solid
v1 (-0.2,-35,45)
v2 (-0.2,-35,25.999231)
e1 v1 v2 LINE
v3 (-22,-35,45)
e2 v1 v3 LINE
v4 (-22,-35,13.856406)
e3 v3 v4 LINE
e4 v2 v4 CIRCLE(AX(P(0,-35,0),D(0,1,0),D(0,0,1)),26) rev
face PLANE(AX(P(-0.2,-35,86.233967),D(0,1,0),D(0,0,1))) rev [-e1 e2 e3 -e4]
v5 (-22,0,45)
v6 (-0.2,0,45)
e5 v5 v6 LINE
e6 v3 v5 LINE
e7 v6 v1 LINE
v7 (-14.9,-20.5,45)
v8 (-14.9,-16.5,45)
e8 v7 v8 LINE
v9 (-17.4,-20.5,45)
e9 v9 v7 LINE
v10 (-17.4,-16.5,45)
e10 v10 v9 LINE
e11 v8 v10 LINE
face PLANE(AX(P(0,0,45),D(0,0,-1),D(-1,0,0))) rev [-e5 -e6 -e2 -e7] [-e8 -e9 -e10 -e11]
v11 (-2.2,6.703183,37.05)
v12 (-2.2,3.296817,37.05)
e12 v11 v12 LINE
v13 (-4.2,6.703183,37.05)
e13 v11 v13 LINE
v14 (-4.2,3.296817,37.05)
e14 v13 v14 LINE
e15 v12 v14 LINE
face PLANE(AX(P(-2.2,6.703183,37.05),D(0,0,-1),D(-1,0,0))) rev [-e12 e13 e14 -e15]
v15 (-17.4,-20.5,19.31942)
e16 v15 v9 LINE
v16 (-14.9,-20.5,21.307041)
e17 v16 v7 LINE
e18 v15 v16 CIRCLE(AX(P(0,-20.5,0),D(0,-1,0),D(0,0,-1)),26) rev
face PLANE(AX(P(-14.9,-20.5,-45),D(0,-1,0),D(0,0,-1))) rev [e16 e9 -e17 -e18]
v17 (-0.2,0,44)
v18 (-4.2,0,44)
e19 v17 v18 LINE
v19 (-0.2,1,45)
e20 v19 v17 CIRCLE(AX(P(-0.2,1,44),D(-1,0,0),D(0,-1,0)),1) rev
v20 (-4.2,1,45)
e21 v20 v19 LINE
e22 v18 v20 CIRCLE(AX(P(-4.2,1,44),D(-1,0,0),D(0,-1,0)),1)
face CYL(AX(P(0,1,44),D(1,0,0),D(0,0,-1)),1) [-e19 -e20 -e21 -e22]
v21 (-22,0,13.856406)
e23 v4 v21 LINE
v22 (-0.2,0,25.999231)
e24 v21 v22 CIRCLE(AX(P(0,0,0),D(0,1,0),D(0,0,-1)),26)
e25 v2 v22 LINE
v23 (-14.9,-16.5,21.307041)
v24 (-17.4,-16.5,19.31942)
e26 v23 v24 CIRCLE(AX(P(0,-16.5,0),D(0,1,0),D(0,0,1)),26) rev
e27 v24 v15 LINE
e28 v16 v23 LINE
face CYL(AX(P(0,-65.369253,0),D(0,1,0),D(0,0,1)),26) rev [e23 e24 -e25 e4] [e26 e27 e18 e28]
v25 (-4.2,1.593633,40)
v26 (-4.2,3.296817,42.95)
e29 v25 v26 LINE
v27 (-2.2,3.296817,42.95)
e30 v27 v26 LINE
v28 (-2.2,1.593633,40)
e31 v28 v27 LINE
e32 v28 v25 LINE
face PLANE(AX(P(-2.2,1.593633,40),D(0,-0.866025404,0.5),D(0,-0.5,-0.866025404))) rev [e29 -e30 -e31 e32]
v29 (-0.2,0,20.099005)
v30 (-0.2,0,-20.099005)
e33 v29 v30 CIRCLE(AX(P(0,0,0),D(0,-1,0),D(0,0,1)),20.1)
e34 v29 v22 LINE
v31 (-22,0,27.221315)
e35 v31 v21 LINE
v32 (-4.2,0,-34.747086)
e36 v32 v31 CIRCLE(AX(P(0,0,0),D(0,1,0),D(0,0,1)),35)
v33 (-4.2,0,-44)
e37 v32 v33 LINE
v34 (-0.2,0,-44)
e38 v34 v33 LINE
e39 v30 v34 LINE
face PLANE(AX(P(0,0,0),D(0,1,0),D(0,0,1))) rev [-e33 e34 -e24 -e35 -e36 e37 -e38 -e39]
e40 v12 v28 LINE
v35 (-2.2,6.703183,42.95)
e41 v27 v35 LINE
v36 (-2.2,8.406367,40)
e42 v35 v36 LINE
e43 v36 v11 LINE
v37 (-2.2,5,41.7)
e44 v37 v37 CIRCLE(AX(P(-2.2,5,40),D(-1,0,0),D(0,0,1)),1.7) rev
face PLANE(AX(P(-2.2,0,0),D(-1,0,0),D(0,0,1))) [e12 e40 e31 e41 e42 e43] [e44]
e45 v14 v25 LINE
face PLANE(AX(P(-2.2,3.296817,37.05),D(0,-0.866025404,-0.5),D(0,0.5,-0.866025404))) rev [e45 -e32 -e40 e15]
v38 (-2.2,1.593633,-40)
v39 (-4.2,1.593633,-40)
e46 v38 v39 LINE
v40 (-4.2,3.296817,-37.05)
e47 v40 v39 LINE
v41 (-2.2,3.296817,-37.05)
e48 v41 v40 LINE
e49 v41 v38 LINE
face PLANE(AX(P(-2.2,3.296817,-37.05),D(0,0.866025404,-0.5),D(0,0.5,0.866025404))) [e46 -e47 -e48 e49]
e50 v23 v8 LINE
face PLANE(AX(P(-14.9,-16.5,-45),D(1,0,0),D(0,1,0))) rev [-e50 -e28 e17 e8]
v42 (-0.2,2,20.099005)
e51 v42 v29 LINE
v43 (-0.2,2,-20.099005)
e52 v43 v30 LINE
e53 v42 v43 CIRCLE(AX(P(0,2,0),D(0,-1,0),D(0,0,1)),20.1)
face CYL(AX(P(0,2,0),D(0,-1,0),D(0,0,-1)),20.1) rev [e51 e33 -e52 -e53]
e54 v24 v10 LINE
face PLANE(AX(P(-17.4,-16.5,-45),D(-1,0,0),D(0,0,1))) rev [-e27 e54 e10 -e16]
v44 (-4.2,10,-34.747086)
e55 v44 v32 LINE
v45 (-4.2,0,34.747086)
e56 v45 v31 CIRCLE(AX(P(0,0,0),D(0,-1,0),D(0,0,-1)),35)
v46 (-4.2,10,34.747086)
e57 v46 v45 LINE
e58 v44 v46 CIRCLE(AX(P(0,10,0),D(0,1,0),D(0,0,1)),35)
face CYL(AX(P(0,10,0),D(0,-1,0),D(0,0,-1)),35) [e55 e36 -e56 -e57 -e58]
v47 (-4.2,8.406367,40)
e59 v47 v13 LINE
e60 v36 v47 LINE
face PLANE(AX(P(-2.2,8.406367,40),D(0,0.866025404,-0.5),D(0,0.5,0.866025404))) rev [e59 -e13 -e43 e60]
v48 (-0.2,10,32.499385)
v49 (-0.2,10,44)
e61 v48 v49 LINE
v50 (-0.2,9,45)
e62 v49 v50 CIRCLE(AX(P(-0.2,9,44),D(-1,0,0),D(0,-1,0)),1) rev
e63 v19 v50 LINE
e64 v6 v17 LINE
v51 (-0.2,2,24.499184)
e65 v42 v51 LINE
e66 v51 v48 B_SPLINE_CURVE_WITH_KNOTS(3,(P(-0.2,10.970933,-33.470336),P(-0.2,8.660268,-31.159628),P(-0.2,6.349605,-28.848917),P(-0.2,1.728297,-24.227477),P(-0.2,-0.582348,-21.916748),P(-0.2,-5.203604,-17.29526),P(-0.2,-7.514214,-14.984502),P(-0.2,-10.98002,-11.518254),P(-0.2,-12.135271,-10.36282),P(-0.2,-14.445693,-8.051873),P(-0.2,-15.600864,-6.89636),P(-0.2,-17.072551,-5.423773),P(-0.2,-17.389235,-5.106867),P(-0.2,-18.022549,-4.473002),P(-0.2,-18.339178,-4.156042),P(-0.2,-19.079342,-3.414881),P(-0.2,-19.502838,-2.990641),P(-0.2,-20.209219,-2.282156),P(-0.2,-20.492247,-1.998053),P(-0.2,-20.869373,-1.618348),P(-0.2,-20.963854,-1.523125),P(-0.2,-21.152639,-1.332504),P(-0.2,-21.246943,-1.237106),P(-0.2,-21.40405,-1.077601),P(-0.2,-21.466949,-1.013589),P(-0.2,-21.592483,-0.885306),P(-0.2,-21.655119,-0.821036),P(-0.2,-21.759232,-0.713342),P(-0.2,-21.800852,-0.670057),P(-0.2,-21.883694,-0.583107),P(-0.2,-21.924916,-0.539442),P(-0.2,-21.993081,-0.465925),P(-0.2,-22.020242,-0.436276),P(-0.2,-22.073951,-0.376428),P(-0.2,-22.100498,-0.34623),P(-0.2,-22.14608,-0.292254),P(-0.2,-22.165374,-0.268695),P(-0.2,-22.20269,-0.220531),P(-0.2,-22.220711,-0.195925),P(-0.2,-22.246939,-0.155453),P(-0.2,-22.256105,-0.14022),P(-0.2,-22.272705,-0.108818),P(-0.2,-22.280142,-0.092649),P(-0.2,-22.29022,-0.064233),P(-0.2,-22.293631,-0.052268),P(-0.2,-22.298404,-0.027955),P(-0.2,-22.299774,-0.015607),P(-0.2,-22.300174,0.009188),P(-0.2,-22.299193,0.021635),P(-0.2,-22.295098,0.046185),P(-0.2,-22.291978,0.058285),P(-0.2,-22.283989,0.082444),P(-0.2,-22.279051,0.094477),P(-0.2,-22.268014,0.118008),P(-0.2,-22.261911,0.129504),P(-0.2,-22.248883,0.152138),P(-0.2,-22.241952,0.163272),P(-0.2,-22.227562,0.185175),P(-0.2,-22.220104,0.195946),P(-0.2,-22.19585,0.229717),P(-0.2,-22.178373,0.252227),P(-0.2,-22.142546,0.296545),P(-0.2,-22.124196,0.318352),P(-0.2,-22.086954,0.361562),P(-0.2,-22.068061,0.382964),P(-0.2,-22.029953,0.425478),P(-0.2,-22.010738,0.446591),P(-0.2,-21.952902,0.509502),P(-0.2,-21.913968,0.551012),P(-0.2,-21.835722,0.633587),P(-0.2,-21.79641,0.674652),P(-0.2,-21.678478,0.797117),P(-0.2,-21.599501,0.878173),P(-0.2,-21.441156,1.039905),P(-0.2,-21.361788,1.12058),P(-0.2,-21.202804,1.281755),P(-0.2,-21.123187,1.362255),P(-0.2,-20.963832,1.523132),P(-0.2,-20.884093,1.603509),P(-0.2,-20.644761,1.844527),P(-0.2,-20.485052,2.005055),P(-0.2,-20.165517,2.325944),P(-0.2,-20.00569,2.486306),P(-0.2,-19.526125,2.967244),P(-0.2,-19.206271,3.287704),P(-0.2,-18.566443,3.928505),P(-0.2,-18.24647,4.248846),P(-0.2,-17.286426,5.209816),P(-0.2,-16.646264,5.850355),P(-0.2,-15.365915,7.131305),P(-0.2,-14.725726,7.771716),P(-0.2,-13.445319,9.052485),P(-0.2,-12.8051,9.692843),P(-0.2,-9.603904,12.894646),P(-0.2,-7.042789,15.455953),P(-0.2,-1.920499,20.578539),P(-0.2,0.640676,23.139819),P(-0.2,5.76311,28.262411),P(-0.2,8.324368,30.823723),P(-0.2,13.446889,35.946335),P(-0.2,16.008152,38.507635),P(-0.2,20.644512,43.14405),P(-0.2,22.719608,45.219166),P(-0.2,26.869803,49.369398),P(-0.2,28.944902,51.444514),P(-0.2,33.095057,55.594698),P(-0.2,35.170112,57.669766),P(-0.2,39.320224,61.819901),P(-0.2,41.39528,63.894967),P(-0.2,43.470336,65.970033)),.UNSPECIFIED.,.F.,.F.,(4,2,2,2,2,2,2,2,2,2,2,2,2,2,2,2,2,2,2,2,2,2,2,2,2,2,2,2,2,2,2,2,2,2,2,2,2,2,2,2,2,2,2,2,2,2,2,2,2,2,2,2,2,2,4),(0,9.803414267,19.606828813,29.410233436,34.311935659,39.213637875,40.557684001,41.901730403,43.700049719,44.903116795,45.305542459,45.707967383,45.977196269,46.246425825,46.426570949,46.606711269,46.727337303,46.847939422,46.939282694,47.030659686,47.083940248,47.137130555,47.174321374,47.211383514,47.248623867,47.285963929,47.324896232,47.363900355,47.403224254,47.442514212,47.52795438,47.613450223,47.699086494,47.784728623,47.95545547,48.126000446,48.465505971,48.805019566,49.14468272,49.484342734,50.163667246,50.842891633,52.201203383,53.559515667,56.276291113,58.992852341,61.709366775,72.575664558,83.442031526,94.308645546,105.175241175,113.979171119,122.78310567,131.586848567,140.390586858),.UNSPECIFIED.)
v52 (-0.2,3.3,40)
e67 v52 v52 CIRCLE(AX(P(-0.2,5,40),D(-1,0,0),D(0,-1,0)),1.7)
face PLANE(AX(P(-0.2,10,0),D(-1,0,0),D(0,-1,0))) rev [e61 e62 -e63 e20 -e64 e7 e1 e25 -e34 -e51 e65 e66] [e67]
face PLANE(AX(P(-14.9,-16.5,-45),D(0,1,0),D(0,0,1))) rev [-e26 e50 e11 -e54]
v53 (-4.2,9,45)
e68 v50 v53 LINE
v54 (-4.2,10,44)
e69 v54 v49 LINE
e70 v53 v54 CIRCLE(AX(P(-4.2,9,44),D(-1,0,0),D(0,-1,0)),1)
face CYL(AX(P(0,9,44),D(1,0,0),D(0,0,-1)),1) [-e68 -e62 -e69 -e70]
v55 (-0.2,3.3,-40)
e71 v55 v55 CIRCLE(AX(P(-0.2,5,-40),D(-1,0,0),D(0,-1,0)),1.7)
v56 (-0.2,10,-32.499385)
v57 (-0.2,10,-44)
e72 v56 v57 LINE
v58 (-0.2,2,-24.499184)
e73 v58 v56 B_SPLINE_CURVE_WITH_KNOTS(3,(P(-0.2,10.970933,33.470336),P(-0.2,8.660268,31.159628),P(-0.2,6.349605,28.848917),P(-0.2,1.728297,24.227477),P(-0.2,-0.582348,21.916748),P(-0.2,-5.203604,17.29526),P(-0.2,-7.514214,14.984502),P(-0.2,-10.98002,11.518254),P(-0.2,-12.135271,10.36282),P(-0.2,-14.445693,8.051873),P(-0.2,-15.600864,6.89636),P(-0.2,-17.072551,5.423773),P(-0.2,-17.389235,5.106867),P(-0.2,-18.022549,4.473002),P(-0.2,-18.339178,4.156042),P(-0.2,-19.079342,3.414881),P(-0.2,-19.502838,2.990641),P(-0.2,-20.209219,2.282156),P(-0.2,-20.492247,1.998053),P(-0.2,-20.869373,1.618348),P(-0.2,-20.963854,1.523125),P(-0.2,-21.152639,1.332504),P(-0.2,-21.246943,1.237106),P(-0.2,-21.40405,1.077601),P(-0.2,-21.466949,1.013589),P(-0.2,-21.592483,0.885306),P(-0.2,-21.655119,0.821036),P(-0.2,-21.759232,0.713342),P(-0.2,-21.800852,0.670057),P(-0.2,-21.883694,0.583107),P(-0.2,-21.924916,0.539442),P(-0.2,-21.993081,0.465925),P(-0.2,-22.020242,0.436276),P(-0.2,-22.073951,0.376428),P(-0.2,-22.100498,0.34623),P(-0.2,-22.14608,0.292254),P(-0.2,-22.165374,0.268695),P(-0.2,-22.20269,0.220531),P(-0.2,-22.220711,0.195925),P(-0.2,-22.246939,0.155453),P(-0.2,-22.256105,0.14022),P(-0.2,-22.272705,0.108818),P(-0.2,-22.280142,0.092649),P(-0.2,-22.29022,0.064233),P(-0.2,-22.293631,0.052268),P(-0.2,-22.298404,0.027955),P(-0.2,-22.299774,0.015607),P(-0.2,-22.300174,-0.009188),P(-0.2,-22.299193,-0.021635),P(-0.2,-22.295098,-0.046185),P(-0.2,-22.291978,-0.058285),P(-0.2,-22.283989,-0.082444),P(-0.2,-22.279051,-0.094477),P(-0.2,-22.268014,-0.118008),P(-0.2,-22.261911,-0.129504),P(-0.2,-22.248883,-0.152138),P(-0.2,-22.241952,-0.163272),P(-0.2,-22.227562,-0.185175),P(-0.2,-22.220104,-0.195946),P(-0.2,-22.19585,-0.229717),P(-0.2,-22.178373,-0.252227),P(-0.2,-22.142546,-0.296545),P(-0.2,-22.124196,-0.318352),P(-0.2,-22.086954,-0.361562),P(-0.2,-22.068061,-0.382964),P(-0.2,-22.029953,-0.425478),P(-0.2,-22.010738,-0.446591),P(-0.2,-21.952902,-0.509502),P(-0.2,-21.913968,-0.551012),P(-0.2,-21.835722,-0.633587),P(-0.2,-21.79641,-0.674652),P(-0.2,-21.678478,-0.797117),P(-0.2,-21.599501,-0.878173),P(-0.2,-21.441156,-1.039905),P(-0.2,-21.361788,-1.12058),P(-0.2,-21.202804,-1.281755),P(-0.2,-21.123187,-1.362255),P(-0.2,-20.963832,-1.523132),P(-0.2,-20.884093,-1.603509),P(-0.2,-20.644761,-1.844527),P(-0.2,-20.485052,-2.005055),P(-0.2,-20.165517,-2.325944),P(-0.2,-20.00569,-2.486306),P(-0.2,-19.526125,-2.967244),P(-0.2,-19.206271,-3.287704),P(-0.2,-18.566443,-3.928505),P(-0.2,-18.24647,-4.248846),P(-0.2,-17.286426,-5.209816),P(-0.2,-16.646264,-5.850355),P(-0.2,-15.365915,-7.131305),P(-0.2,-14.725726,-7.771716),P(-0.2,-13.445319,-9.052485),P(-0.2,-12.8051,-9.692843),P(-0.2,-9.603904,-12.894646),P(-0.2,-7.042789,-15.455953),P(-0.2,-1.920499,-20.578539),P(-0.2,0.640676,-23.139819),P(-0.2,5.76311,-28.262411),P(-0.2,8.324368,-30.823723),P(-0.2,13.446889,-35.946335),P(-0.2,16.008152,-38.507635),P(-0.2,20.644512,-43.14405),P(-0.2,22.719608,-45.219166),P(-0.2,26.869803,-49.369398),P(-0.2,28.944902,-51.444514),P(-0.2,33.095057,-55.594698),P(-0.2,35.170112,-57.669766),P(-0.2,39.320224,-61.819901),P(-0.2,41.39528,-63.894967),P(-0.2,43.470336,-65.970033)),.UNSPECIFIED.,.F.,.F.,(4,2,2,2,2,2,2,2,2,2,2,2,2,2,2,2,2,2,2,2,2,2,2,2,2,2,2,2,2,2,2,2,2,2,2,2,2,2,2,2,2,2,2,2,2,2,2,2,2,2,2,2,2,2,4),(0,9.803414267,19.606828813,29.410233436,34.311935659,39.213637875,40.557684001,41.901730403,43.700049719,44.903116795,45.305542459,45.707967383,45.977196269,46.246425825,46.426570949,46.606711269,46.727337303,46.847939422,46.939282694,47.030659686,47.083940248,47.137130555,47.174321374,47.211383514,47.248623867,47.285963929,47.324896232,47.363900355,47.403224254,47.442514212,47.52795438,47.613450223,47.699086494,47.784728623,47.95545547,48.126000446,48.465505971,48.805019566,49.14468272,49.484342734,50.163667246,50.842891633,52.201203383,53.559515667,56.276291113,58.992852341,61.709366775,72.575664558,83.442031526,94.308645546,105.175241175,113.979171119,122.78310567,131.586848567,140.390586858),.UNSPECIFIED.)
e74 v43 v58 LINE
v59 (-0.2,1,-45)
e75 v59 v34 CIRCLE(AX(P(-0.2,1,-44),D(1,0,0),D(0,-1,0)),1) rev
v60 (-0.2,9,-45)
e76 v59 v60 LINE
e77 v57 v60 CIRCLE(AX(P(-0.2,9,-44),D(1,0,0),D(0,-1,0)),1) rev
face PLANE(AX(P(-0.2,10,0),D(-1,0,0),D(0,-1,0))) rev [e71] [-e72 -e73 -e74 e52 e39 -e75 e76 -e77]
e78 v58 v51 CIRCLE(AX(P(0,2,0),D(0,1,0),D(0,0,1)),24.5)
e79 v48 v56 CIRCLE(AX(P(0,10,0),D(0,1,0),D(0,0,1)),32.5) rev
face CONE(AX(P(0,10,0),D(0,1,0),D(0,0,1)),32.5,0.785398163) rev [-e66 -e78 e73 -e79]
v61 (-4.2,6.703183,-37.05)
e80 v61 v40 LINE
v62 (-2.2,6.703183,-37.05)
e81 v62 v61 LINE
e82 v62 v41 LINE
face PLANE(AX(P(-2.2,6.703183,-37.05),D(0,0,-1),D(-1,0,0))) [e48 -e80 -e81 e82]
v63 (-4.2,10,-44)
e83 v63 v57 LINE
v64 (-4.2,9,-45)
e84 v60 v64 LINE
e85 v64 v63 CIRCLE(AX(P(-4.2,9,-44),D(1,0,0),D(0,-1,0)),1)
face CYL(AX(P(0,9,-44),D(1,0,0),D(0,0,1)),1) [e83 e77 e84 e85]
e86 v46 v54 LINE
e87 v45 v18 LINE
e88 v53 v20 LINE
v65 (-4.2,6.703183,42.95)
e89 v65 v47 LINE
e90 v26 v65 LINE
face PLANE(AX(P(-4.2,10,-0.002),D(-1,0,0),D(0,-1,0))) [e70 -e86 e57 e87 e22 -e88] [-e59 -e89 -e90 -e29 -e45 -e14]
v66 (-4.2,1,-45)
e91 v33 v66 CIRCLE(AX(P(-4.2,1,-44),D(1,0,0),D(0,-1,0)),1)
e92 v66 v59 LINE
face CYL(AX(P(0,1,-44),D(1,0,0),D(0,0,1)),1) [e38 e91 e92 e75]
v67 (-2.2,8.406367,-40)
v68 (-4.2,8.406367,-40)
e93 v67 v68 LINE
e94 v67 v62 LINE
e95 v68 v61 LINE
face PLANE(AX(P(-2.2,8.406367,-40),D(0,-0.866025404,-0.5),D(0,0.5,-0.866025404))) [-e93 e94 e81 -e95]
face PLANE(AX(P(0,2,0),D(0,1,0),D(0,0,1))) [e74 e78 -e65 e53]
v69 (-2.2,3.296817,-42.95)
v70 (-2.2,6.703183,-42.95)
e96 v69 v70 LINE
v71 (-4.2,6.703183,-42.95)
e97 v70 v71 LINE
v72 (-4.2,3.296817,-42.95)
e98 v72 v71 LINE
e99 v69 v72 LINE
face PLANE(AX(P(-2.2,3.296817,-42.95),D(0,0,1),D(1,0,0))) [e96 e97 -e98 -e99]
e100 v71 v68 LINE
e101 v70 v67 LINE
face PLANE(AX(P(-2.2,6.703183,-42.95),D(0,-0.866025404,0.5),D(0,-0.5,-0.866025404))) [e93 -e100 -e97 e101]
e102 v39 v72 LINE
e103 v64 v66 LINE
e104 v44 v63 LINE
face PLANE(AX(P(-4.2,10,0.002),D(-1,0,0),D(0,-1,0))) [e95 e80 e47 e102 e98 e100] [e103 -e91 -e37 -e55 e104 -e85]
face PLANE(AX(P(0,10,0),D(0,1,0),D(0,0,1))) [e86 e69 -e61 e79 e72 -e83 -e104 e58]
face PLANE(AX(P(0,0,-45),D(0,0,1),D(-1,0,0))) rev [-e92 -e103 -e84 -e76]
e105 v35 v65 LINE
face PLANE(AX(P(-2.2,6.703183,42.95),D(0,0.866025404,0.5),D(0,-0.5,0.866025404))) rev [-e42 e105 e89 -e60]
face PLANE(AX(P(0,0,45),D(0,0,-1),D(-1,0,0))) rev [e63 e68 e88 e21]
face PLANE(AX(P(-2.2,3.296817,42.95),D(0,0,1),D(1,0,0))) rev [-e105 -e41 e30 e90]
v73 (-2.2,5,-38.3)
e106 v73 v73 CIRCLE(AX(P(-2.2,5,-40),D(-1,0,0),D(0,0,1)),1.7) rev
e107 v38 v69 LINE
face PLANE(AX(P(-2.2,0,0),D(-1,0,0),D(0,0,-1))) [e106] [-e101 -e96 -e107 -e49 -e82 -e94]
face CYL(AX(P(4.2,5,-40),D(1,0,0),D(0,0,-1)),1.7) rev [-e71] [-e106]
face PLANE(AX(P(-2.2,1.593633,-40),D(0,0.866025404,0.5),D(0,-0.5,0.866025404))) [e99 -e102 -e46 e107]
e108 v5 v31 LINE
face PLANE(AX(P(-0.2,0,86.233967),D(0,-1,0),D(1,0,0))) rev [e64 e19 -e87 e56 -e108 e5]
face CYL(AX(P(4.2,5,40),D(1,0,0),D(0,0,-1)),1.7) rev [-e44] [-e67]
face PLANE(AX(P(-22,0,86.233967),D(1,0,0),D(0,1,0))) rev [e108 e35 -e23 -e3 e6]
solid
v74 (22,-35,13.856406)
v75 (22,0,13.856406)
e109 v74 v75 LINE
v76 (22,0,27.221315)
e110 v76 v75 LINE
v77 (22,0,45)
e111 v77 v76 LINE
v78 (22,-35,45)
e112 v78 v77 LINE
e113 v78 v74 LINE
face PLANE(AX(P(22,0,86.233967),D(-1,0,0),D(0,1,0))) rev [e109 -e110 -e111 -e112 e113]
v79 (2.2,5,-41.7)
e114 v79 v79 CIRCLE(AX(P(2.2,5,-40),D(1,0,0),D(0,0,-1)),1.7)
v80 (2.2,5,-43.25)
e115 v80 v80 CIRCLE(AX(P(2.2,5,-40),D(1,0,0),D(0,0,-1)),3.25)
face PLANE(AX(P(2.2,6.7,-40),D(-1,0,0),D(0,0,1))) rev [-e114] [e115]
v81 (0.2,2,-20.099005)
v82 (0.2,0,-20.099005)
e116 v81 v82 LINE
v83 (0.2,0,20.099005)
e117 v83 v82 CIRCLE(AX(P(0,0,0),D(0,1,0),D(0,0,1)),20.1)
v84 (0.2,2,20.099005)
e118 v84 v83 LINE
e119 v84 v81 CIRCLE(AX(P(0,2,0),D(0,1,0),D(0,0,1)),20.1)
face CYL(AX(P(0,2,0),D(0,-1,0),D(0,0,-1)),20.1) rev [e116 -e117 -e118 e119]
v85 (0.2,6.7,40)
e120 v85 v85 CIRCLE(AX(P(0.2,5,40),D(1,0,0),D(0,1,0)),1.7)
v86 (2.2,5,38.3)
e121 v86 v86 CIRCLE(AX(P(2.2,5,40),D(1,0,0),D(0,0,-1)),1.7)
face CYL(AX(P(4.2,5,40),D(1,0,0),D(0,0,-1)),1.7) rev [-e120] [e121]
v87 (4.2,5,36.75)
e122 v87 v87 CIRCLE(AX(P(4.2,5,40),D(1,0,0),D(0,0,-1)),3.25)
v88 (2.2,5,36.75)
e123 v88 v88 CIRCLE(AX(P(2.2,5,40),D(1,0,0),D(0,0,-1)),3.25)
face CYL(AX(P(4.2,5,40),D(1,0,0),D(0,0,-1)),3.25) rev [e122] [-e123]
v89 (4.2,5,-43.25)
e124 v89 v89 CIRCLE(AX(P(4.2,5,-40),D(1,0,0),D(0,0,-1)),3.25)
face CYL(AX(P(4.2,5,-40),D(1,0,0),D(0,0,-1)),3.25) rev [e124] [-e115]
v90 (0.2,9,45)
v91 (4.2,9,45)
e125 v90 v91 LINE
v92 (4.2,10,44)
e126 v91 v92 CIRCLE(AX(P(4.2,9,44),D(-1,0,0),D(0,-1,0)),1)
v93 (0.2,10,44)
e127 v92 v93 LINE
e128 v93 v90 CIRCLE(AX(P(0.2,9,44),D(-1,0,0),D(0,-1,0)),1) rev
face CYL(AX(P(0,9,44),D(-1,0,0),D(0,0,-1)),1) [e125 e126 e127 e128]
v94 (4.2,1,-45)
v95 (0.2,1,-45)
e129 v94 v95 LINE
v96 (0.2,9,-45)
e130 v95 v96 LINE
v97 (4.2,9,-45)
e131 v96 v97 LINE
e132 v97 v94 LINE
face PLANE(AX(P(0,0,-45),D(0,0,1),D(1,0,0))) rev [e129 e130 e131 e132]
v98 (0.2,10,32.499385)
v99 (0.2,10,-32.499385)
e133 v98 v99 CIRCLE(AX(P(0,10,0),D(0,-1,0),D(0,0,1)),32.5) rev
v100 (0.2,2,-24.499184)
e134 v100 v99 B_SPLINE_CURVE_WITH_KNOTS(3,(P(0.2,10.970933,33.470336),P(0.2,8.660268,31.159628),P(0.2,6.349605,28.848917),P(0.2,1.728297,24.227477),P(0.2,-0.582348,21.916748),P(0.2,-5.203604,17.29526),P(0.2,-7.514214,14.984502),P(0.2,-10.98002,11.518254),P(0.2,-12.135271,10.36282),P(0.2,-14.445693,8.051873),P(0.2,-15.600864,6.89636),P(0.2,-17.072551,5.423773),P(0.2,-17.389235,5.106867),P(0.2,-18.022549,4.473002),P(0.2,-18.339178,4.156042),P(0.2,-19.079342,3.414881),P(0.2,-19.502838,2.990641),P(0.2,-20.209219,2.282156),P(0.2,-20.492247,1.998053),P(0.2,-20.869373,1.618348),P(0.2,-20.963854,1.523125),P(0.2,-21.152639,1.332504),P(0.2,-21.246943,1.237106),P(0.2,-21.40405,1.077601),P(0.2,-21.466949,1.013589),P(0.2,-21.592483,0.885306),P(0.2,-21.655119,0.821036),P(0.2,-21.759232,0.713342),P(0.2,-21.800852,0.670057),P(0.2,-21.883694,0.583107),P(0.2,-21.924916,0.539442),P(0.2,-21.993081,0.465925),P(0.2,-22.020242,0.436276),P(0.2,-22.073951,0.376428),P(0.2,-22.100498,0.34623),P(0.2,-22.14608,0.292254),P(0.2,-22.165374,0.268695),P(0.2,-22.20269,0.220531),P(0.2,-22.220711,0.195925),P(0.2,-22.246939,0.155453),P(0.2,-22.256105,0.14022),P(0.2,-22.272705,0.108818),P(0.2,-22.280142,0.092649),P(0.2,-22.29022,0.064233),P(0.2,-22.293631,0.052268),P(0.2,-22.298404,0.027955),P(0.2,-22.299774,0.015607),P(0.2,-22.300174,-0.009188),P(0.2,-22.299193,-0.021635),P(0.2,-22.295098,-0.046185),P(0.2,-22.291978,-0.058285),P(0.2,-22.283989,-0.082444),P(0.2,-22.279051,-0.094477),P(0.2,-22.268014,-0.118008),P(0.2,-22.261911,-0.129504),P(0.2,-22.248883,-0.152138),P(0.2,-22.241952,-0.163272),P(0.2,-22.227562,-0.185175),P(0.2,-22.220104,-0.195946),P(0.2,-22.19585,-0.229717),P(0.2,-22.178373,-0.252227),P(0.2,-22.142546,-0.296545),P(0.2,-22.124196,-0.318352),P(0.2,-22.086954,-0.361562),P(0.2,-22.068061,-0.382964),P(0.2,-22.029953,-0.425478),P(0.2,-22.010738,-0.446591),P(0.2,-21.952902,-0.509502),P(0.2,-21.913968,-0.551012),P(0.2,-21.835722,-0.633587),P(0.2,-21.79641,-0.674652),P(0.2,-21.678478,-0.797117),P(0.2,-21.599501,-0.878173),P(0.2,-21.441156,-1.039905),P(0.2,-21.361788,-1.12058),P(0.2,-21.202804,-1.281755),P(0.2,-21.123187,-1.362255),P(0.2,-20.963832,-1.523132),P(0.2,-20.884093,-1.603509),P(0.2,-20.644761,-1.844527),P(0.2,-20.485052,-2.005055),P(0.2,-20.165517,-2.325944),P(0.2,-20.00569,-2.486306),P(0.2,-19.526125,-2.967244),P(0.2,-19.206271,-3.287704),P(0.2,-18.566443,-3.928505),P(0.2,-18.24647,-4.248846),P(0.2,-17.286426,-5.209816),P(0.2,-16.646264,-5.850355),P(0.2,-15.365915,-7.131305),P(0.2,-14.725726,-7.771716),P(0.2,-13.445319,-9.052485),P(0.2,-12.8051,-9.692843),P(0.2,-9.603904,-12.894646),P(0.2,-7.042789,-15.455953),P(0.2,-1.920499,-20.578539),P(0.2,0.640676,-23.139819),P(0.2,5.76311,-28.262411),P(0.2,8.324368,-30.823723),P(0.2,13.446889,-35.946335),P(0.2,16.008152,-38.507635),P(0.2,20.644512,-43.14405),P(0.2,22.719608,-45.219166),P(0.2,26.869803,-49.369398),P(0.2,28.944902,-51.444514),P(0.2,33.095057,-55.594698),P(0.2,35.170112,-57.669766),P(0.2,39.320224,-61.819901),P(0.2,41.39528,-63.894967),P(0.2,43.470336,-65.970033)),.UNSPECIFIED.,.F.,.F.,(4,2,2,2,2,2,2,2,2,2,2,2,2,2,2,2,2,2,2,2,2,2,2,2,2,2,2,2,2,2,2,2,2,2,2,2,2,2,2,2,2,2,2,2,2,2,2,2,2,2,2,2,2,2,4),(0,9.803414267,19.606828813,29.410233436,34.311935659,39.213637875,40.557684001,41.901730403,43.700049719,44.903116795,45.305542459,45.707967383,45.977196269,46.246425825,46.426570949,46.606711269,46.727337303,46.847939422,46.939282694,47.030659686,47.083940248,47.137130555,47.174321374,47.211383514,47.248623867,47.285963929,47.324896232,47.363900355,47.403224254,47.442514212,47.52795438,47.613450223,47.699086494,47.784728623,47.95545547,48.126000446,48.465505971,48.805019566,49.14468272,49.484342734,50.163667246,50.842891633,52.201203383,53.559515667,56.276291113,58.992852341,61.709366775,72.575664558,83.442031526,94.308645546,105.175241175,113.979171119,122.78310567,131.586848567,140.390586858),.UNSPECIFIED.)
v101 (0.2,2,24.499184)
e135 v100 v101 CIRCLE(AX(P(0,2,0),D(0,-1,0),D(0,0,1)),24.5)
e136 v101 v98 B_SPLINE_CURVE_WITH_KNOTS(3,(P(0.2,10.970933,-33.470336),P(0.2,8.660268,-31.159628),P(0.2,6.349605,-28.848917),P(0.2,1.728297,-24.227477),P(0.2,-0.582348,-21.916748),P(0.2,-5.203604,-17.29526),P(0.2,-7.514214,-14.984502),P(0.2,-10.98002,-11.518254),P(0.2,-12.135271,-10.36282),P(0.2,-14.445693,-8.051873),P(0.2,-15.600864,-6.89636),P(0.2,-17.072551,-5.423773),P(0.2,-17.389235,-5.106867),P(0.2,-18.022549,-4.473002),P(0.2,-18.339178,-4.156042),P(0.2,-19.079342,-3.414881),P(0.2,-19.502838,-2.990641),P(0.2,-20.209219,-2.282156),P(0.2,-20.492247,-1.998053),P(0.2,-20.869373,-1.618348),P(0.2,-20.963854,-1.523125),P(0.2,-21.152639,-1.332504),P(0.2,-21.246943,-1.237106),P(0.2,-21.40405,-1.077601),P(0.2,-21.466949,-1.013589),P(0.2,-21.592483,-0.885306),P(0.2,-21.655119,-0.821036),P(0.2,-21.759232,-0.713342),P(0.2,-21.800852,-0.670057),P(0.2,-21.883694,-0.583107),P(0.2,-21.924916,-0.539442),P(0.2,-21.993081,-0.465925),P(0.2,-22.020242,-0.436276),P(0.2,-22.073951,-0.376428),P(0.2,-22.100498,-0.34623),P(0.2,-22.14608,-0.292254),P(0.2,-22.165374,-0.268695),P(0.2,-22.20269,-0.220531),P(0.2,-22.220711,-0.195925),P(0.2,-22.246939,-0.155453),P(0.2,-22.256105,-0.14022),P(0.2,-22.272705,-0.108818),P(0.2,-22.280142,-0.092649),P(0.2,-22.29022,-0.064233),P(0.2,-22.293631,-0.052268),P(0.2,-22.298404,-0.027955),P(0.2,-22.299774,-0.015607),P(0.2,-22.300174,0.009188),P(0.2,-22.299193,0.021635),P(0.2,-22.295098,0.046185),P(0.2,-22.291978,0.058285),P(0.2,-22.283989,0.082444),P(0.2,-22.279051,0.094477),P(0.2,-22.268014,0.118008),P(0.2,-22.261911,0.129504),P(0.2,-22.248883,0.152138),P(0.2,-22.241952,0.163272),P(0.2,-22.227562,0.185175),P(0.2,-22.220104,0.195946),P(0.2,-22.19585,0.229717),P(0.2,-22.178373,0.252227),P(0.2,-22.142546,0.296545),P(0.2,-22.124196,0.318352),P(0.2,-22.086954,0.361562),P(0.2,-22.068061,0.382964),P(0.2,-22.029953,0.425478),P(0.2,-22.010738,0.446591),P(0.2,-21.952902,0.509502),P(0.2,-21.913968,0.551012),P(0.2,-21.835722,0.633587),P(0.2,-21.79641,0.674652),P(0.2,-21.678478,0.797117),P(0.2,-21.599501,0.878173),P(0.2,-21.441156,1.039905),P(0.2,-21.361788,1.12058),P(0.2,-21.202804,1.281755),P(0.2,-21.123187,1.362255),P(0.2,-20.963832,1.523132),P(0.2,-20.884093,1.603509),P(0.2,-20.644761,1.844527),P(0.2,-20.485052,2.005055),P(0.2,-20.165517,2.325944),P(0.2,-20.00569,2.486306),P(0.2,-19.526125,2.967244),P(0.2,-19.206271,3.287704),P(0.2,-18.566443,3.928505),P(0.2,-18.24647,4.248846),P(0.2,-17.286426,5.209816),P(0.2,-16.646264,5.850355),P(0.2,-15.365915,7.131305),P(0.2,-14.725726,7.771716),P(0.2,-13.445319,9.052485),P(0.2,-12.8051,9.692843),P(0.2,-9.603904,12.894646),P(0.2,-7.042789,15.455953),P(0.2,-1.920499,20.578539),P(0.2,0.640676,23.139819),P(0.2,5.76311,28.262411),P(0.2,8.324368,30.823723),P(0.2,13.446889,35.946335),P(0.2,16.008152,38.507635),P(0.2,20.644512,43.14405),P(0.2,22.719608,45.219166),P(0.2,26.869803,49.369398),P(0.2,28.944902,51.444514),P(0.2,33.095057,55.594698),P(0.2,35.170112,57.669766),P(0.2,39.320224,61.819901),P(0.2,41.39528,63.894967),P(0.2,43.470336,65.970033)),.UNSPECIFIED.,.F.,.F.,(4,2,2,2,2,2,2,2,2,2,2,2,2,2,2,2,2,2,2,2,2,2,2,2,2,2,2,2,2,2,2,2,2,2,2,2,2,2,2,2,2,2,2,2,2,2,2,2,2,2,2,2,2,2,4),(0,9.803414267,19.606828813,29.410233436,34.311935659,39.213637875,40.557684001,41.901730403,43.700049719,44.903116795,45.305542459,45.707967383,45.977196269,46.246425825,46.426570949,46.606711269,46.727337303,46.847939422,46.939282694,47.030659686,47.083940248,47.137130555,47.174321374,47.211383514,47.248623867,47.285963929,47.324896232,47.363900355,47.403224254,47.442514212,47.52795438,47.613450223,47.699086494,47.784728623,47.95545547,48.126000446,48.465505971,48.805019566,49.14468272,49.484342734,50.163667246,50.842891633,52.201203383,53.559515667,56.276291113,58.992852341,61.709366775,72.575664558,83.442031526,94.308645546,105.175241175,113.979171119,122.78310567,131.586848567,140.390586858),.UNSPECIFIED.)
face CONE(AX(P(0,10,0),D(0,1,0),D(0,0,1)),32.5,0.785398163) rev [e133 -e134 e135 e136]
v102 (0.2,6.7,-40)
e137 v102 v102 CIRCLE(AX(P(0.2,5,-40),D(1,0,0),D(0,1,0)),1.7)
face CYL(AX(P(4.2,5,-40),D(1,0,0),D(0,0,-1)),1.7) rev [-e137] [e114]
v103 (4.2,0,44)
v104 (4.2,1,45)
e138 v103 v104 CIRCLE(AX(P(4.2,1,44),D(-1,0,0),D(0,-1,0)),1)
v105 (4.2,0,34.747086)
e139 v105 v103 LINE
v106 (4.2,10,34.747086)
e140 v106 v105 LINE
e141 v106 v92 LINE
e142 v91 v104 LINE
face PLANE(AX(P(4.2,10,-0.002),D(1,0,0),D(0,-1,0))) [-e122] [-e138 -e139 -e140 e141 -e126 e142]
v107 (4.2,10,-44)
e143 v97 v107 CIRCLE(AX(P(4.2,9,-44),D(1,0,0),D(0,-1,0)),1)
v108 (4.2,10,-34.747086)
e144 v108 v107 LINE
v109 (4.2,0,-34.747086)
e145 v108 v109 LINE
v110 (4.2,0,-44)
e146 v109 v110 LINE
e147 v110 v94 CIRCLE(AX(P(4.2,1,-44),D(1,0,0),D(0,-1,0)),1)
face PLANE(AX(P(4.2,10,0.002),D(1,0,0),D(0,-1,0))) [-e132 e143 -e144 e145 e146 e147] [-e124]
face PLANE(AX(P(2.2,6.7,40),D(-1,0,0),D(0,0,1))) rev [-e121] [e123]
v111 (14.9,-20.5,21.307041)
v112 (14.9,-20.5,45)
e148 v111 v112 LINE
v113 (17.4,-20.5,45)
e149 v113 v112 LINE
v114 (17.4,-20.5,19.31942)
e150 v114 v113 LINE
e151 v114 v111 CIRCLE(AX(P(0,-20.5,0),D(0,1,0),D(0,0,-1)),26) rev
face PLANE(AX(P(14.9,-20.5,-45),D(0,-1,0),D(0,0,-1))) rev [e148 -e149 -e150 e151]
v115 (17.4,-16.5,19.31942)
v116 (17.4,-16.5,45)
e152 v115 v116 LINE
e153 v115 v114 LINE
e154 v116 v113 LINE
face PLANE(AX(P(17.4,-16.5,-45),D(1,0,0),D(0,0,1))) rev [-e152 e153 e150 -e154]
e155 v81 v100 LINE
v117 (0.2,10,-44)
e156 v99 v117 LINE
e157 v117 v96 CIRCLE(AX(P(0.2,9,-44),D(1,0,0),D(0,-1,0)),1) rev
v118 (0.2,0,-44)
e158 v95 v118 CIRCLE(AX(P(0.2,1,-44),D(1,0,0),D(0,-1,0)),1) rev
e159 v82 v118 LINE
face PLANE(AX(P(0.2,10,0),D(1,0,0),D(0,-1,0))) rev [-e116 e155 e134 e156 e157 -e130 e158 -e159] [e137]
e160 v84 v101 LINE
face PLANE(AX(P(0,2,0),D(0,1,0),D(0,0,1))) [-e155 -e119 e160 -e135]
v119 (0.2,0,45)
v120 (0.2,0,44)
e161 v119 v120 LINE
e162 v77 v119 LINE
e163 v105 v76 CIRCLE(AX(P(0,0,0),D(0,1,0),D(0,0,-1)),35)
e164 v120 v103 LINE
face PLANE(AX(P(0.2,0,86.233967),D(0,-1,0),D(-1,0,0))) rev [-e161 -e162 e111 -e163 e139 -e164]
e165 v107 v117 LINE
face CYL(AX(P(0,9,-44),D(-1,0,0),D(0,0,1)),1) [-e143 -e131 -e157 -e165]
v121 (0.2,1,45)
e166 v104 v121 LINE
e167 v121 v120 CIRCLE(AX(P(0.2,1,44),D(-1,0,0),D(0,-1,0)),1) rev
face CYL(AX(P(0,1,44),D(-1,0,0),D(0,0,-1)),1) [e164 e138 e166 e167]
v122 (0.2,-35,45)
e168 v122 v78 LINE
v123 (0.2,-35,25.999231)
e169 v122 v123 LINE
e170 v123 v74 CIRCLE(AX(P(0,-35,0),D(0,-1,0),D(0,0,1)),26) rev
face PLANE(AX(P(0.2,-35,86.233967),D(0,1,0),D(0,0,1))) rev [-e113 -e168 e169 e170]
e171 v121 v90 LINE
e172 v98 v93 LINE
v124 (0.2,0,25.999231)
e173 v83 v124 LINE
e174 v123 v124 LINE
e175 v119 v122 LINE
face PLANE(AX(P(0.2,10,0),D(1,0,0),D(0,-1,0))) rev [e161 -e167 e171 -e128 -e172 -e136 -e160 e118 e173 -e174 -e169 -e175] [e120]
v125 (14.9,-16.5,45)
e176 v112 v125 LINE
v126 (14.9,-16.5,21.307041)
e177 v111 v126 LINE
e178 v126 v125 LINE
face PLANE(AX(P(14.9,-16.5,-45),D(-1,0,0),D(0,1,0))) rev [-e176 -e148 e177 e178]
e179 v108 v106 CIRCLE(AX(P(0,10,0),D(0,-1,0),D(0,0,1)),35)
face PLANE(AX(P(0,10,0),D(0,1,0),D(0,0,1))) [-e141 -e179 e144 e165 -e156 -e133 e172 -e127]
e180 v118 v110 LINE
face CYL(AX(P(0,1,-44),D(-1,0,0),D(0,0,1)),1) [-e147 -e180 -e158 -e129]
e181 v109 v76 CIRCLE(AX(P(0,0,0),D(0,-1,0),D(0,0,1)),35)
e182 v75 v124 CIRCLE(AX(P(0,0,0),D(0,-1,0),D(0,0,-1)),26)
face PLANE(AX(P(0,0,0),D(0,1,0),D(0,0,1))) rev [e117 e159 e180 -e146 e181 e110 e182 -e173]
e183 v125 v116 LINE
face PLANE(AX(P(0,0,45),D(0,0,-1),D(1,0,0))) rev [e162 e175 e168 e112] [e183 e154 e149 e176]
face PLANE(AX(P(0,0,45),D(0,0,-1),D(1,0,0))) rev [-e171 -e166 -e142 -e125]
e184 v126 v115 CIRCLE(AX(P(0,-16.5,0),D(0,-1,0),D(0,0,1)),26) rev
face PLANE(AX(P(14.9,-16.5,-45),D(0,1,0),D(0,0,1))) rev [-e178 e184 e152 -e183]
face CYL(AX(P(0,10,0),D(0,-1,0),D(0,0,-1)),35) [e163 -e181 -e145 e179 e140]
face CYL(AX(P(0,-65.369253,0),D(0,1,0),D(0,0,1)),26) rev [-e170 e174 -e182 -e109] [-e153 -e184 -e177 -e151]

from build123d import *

# Parameters (mm, degrees)
SALIENTE_EXTRUIR1_DEPTH                     = 2
SALIENTE_EXTRUIR3_DEPTH                     = 10
CHAFL_N1_SIZE                               = 10
CROQUIS8_W                                  = 0.2
CROQUIS8_H                                  = 10
CORTAR_EXTRUIR3_DEPTH                       = 51.497524692
CROQUIS9_W                                  = 4
CROQUIS9_H                                  = 10
SALIENTE_EXTRUIR5_DEPTH                     = 10
SALIENTE_EXTRUIR5_DIRECTION_2_REACH         = 52.498
REDONDEO4_R                                 = 1
CROQUIS11_W                                 = 21.8
CROQUIS11_H                                 = 35
SALIENTE_EXTRUIR7_DEPTH                     = 10
SALIENTE_EXTRUIR8_DEPTH                     = 35
CROQUIS13_W                                 = 2.5
CROQUIS13_H                                 = 4
CORTAR_EXTRUIR4_DEPTH                       = 103.713192921
REFRENTADO_PARA_TORNILLO_CON_CABEZA_2_COUNT = 2
REFRENTADO_PARA_TORNILLO_CON_CABEZA_2_PITCH = 80
CORTAR_EXTRUIR5_DEPTH                       = 2


with BuildPart() as part:
    # Croquis1 → Saliente-Extruir1 (new body)
    with BuildSketch(Plane(origin=(0, 0, 0), x_dir=(1, 0, 0), z_dir=(0, 1, 0))):
        with BuildLine():
            Line((-22.5, 0), (-20.1, 0))
            ThreePointArc((-20.1, 0), (-14.212846302, -14.212846302), (0, -20.1))
            Line((0, -20.1), (0, -22.5))
            ThreePointArc((0, -22.5), (-15.909902577, -15.909902577), (-22.5, 0))
        make_face()
    extrude(amount=SALIENTE_EXTRUIR1_DEPTH)

    # Croquis6 → Saliente-Extruir3 (add)
    with BuildSketch(Plane(origin=(0, 0, 0), x_dir=(1, 0, 0), z_dir=(0, 1, 0))):
        with BuildLine():
            Line((-35, 0), (-22.5, 0))
            ThreePointArc((-22.5, 0), (-15.909902577, -15.909902577), (0, -22.5))
            Line((0, -22.5), (0, -35))
            ThreePointArc((0, -35), (-24.748737342, -24.748737342), (-35, 0))
        make_face()
    extrude(amount=SALIENTE_EXTRUIR3_DEPTH)

    # Chaflán1
    # the kernel refuses this chamfer: 10 mm, written as the material it takes off along each edge
    with BuildSketch(Plane(origin=(0, 10, 0), x_dir=(-0.4144760255692251, 0, -0.9100602310992054), z_dir=(0.9100602310992054, 0, -0.4144760255692251))) as chafl_n1_piece_1_section:
        Polygon((22.5, -CHAFL_N1_SIZE), (22.5 + CHAFL_N1_SIZE, 0), (22.5, 0), align=None)
    chafl_n1_piece_1 = revolve(axis=Axis((0, 10, 0), (0, 1, 0)), revolution_arc=221.027352693, mode=Mode.PRIVATE)
    chafl_n1_piece_1 = split(chafl_n1_piece_1, bisect_by=Plane(origin=(-20.16579523, 2, 20.16579523), z_dir=(0, 1, 0)), keep=Keep.TOP, mode=Mode.PRIVATE)
    add(chafl_n1_piece_1, mode=Mode.SUBTRACT)

    # Croquis8 → Cortar-Extruir3 (cut, through all)
    with BuildSketch(Plane.XY.offset(35)):
        with Locations((-0.1, 5)):
            Rectangle(CROQUIS8_W, CROQUIS8_H)
    extrude(amount=-CORTAR_EXTRUIR3_DEPTH, mode=Mode.SUBTRACT)

    # Croquis9 → Saliente-Extruir5 (add)
    with BuildSketch(Plane.XY.offset(35)):
        with Locations((-2.2, 5)):
            Rectangle(CROQUIS9_W, CROQUIS9_H)
    extrude(amount=SALIENTE_EXTRUIR5_DEPTH)

    # Croquis9 → Saliente-Extruir5 direction 2 (add, up to next)
    with BuildSketch(Plane.XY.offset(35), mode=Mode.PRIVATE) as saliente_extruir5_direction_2_sk1:
        with Locations((-2.2, 5)):
            Rectangle(CROQUIS9_W, CROQUIS9_H)
    saliente_extruir5_direction_2_tool1 = extrude(saliente_extruir5_direction_2_sk1.sketch, amount=-SALIENTE_EXTRUIR5_DIRECTION_2_REACH, mode=Mode.PRIVATE) - part.part
    add(saliente_extruir5_direction_2_tool1.solids().sort_by_distance((-2.2, 5, 35))[0])

    # Redondeo4
    redondeo4_edges = [part.edges().sort_by_distance(p)[0] for p in [
        (-2.2, 10, 45),
        (-2.2, 0, 45),
    ]]
    fillet(redondeo4_edges, radius=REDONDEO4_R)

    # Simetría30: part across plane


with BuildPart() as part_1:
    add(part.part)
    add(part.part.mirror(Plane.XY))

    # Croquis11 → Saliente-Extruir7 (add)
    with BuildSketch(Plane.XY.offset(35)):
        with Locations((-11.1, -17.5)):
            Rectangle(CROQUIS11_W, CROQUIS11_H)
    extrude(amount=SALIENTE_EXTRUIR7_DEPTH)

    # Croquis12 → Saliente-Extruir8 (add)
    with BuildSketch(Plane.XZ):
        with BuildLine():
            Line((-0.2, 35), (-0.2, 25.999230758))
            ThreePointArc((-0.2, 25.999230758), (-12.651958168, 22.714047515), (-22, 13.856406461))
            Line((-22, 13.856406461), (-22, 27.221315178))
            Line((-22, 27.221315178), (-22, 35))
            Line((-22, 35), (-0.2, 35))
        make_face()
    extrude(amount=SALIENTE_EXTRUIR8_DEPTH)

    # Croquis13 → Cortar-Extruir4 (cut, through all)
    with BuildSketch(Plane.XY.offset(45)):
        with Locations((-16.15, -18.5)):
            Rectangle(CROQUIS13_W, CROQUIS13_H)
    extrude(amount=-CORTAR_EXTRUIR4_DEPTH, mode=Mode.SUBTRACT)


with BuildPart() as body_2:
    # Simetría32: mirrored copy
    add(part_1.part.mirror(Plane(origin=(0, 0, 0), x_dir=(0, 0, 1), z_dir=(1, 0, 0))))


with BuildPart() as refrentado_para_tornillo_con_cabeza_plan_tool:
    # Croquis15 → Refrentado para tornillo con cabeza plana de M31 (revolve)
    with BuildSketch(Plane(origin=(4.2, 5, 40), x_dir=(0, 0, -1), z_dir=(0, 1, 0))):
        Polygon((0, 0), (0, 39.2), (1.7, 39.2), (1.7, 2), (3.25, 2), (3.25, 0), align=None)
    refrentado_para_tornillo_con_cabeza_plan = revolve(axis=Axis((10.55, 5, 40), (-1, 0, 0)))


with BuildPart() as part_2:
    add(part_1.part)

    # Refrentado para tornillo con cabeza plana de M31: cut by refrentado_para_tornillo_con_cabeza_plan_tool
    add(refrentado_para_tornillo_con_cabeza_plan_tool.part, mode=Mode.SUBTRACT)


with BuildPart() as body_2_1:
    add(body_2.part)

    # Refrentado para tornillo con cabeza plana de M31: cut by refrentado_para_tornillo_con_cabeza_plan_tool
    add(refrentado_para_tornillo_con_cabeza_plan_tool.part, mode=Mode.SUBTRACT)


with BuildPart() as refrentado_para_tornillo_con_cabeza_2_tool:
    # Refrentado para tornillo con cabeza  2: Refrentado para tornillo con cabeza plana de M31 ×2
    with Locations(*[(0, 0, -i * REFRENTADO_PARA_TORNILLO_CON_CABEZA_2_PITCH) for i in range(1, REFRENTADO_PARA_TORNILLO_CON_CABEZA_2_COUNT)]):
        add(refrentado_para_tornillo_con_cabeza_plan)


with BuildPart() as part_3:
    add(part_2.part)

    # Refrentado para tornillo con cabeza  2: cut by refrentado_para_tornillo_con_cabeza_2_tool
    add(refrentado_para_tornillo_con_cabeza_2_tool.part, mode=Mode.SUBTRACT)

    # Croquis17 → Cortar-Extruir5 (cut)
    with BuildSketch(Plane.ZY.offset(4.2)):
        Polygon((40, 8.406366588), (37.05, 6.703183294), (37.05, 3.296816706), (40, 1.593633412), (42.95, 3.296816706), (42.95, 6.703183294), align=None)
    cortar_extruir5 = extrude(amount=-CORTAR_EXTRUIR5_DEPTH, mode=Mode.SUBTRACT)

    # Simetría33: Cortar-Extruir5 across plane
    add(cortar_extruir5.mirror(Plane.XY), mode=Mode.SUBTRACT)


with BuildPart() as body_2_2:
    add(body_2_1.part)

    # Refrentado para tornillo con cabeza  2: cut by refrentado_para_tornillo_con_cabeza_2_tool
    add(refrentado_para_tornillo_con_cabeza_2_tool.part, mode=Mode.SUBTRACT)


solid = Compound([part_3.part, body_2_2.part])
